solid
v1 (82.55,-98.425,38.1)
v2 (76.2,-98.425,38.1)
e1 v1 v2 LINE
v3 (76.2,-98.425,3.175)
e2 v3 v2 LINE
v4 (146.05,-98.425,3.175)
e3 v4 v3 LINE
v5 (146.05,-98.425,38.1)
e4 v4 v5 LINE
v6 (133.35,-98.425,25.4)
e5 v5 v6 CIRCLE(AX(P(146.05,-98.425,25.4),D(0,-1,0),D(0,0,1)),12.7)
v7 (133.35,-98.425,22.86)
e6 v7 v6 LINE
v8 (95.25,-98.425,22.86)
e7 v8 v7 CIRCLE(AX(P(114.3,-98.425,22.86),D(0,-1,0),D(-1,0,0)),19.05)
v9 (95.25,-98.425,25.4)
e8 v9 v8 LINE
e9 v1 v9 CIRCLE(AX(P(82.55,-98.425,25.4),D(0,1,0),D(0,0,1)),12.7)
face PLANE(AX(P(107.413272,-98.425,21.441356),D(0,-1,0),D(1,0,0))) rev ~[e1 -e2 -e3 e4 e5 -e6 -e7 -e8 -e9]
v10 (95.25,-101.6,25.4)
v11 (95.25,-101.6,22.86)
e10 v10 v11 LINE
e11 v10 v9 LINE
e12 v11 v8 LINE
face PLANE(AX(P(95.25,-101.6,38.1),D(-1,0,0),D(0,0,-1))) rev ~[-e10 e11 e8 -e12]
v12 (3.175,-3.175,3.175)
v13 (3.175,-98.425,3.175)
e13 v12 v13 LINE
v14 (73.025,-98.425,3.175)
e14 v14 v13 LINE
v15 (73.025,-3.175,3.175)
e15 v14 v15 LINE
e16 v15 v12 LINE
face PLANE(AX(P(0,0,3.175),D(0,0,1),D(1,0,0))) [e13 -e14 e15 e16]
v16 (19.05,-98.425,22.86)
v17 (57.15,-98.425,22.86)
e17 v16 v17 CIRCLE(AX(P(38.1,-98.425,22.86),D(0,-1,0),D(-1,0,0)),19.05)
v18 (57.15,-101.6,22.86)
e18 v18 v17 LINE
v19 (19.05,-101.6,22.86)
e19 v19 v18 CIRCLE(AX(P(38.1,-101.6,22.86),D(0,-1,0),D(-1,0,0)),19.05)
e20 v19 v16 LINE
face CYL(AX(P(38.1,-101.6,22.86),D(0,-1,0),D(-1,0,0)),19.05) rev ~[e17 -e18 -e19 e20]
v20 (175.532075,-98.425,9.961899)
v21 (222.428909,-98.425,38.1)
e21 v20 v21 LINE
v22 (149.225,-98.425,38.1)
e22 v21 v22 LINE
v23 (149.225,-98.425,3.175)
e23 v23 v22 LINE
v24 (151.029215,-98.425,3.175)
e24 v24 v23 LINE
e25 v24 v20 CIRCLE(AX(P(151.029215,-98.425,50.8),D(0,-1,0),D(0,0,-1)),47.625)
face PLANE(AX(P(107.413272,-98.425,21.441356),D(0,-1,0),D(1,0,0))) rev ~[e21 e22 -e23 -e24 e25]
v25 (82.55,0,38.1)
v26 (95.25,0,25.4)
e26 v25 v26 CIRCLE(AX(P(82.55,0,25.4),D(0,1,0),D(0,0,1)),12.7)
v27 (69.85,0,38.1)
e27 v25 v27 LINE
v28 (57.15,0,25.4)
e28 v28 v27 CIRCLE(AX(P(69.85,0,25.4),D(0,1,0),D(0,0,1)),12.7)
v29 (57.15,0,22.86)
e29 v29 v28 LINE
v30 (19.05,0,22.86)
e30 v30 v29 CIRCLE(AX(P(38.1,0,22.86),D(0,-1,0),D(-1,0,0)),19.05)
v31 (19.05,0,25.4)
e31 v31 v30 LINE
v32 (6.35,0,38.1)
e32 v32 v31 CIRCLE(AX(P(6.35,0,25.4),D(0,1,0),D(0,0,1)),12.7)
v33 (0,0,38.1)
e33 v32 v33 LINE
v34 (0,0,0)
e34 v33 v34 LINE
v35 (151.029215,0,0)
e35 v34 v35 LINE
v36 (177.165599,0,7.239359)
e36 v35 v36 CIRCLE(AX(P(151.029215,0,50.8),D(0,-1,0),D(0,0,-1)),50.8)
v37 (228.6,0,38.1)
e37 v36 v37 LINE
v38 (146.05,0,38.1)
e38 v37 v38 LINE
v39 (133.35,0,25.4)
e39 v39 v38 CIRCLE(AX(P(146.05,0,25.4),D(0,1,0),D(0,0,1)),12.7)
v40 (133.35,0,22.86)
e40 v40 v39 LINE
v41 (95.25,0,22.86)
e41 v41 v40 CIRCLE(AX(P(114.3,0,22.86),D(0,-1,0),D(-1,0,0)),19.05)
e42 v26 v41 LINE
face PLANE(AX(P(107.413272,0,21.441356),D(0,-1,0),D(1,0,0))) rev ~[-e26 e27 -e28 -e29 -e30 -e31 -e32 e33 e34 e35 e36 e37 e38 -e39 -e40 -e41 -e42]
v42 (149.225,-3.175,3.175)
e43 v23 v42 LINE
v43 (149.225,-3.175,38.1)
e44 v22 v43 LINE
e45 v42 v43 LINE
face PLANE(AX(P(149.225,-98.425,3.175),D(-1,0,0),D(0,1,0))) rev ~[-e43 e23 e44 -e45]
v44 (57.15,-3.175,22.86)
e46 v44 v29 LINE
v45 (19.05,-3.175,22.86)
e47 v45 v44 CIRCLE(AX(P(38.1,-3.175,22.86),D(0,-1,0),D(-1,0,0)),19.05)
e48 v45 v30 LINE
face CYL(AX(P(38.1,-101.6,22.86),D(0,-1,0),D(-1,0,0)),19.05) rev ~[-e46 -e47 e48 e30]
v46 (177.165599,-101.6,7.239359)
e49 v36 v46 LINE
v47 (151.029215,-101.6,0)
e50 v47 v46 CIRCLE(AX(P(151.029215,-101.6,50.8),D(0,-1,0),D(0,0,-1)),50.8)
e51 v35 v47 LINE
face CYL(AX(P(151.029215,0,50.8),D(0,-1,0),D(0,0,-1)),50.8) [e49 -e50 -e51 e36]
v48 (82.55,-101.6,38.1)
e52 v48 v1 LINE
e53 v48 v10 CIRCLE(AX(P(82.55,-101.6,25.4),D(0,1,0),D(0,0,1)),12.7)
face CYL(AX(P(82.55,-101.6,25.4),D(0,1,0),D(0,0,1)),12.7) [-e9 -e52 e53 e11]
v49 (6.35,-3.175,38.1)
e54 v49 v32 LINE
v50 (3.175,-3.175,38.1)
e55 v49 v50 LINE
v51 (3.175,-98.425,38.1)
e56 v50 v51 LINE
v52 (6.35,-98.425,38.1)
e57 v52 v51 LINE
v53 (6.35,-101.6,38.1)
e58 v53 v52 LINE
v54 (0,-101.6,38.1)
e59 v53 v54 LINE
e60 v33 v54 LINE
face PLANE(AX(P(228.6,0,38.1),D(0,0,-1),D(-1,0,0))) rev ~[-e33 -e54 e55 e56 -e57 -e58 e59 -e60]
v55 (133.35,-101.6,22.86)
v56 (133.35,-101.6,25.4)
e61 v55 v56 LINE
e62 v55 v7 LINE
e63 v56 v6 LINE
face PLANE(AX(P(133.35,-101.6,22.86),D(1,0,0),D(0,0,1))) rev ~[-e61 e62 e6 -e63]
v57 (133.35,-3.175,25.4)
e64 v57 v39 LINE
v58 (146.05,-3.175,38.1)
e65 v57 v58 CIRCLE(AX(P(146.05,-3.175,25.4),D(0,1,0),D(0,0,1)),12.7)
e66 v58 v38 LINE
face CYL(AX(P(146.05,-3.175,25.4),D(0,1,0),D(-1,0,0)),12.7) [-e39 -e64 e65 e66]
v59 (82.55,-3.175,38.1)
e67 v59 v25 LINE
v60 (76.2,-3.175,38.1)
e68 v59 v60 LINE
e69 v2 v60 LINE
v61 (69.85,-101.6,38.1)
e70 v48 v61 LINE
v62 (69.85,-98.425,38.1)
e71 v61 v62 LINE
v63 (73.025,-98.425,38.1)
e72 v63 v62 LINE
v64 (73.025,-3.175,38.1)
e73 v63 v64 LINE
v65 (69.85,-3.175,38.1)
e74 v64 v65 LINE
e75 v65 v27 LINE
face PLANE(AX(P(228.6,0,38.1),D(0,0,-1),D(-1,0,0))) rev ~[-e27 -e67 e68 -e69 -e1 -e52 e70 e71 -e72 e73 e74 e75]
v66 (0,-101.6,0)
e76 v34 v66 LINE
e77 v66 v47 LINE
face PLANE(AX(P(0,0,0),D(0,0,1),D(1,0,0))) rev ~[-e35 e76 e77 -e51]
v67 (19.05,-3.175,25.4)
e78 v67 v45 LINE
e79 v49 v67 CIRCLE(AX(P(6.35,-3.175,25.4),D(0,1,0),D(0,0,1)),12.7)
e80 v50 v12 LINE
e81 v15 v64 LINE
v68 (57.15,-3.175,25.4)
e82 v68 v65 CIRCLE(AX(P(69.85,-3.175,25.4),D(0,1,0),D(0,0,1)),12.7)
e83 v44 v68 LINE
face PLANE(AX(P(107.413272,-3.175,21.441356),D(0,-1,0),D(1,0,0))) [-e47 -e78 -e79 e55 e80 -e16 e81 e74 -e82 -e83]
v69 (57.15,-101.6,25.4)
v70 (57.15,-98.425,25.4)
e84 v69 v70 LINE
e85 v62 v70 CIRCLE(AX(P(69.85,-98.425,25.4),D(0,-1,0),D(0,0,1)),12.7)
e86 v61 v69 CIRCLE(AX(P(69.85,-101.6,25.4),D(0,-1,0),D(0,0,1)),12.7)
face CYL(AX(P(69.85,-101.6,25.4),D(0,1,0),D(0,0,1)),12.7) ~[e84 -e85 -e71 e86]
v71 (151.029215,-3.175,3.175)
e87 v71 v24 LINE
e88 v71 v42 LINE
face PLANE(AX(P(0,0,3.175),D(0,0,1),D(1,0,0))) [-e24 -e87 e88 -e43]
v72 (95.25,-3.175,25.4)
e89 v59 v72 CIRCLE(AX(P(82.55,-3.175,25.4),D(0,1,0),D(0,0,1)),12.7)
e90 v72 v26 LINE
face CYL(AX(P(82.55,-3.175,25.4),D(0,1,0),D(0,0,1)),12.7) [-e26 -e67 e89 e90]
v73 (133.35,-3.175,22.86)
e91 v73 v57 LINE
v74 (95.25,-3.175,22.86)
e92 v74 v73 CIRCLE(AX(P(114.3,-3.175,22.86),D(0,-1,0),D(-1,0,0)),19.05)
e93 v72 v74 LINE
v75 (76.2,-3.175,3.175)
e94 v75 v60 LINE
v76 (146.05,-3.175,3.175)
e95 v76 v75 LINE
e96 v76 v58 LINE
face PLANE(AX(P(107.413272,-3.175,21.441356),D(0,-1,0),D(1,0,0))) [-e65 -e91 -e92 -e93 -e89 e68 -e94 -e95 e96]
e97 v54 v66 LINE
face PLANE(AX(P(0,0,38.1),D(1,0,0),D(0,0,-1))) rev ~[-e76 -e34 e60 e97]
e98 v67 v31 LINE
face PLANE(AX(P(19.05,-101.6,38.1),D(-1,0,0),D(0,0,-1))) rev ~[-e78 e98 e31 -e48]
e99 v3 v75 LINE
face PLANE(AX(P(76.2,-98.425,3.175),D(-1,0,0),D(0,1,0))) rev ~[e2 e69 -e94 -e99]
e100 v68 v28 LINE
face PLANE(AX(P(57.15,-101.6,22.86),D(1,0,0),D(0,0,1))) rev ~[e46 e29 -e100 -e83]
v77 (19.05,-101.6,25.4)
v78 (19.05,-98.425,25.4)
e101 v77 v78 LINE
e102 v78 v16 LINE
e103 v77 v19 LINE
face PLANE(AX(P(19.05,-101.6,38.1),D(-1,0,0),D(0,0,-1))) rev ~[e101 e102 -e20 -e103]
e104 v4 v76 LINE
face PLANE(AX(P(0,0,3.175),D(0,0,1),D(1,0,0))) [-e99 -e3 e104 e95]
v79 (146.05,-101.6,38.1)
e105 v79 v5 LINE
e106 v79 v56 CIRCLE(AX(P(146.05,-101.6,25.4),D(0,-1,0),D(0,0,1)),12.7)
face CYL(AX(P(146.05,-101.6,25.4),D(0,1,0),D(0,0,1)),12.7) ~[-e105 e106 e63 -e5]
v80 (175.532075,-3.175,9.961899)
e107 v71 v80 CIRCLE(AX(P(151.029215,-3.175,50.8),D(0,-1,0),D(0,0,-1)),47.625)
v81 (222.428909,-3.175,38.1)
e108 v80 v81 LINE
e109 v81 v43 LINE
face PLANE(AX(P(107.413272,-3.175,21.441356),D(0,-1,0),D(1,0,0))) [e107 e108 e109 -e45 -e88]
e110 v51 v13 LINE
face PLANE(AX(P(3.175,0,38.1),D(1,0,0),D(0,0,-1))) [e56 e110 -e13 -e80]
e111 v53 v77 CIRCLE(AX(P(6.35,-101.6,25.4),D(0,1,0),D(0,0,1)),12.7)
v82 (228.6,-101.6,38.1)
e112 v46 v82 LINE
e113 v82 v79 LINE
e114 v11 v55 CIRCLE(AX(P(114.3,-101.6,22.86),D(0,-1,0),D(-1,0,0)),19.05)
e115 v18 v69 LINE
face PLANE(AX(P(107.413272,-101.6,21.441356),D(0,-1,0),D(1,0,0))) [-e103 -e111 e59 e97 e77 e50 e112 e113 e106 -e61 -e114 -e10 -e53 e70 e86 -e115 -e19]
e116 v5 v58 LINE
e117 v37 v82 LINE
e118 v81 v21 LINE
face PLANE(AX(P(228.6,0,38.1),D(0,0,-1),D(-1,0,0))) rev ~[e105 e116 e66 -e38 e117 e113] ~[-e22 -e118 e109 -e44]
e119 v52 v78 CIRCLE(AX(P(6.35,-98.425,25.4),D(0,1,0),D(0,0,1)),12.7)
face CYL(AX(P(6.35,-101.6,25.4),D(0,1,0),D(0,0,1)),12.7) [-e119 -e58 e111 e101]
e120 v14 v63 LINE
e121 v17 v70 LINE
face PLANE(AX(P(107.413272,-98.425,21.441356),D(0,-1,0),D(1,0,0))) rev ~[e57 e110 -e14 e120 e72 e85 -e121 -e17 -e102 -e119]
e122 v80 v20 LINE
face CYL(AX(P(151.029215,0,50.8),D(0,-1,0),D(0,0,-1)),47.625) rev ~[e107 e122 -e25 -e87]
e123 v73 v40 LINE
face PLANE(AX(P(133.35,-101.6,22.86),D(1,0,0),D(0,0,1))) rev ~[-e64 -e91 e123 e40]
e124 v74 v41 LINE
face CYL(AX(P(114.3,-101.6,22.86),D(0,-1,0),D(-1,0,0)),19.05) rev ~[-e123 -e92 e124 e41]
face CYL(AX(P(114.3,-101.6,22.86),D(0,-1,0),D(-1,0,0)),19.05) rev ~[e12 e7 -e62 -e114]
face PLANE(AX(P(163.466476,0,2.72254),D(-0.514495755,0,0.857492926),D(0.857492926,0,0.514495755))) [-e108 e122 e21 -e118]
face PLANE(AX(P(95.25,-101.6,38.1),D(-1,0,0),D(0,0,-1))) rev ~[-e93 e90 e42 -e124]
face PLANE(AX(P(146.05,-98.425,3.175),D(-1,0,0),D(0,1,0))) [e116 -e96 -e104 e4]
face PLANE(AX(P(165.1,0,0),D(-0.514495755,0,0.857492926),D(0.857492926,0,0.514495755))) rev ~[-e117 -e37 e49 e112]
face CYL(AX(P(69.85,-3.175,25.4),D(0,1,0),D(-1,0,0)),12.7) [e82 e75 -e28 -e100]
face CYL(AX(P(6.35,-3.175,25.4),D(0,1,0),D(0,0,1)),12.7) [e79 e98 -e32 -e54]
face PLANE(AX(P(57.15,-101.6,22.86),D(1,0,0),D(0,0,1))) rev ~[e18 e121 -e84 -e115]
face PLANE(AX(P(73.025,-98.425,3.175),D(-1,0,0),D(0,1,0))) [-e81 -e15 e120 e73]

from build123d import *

# Parameters (mm, degrees)
F1_DEPTH = 101.6
F2_R     = 50.8
F3_T     = -3.175
F4_W     = 3.175
F4_H     = 95.25
F5_DEPTH = 34.925
F7_DEPTH = 101.601
F8_R     = 12.7


with BuildPart() as f1:
    # F0 (on Front) → F1 (new body)
    with BuildSketch(Plane.XZ):
        Polygon((0, 38.1), (0, 0), (165.1, 0), (228.6, 38.1), align=None)
    extrude(amount=F1_DEPTH)

    # F2
    f2_edges = [f1.edges().sort_by_distance(p)[0] for p in [
        (165.1, -50.8, 0),
    ]]
    fillet(f2_edges, radius=F2_R)

    # F3
    f3_openings = [f1.faces().sort_by_distance(p)[0] for p in [
        (114.3, -50.8, 38.1),
    ]]
    offset(amount=F3_T, openings=f3_openings)

    # F4 (on face) → F5 (join, through all)
    with BuildSketch(Plane.XY.offset(3.175)):
        with Locations((74.6125, -50.8)):
            Rectangle(F4_W, F4_H)
        with Locations((147.6375, -50.8)):
            Rectangle(F4_W, F4_H)
    extrude(amount=F5_DEPTH)

    # F6 (on face) → F7 (cut, through all)
    with BuildSketch(Plane.XZ.offset(101.6)):
        with BuildLine():
            Line((57.15, 38.1), (19.05, 38.1))
            Line((19.05, 38.1), (19.05, 22.86))
            ThreePointArc((19.05, 22.86), (38.1, 3.81), (57.15, 22.86))
            Line((57.15, 22.86), (57.15, 38.1))
        make_face()
        with BuildLine():
            Line((133.35, 38.1), (95.25, 38.1))
            Line((95.25, 38.1), (95.25, 22.86))
            ThreePointArc((95.25, 22.86), (114.3, 3.81), (133.35, 22.86))
            Line((133.35, 22.86), (133.35, 38.1))
        make_face()
    extrude(amount=-F7_DEPTH, mode=Mode.SUBTRACT)

    # F8
    f8_edges = [f1.edges().sort_by_distance(p)[0] for p in [
        (19.05, -100.0125, 38.1),
        (57.15, -100.0125, 38.1),
        (19.05, -1.5875, 38.1),
        (57.15, -1.5875, 38.1),
        (95.25, -100.0125, 38.1),
        (133.35, -100.0125, 38.1),
        (133.35, -1.5875, 38.1),
        (95.25, -1.5875, 38.1),
    ]]
    fillet(f8_edges, radius=F8_R)


solid = f1.part
